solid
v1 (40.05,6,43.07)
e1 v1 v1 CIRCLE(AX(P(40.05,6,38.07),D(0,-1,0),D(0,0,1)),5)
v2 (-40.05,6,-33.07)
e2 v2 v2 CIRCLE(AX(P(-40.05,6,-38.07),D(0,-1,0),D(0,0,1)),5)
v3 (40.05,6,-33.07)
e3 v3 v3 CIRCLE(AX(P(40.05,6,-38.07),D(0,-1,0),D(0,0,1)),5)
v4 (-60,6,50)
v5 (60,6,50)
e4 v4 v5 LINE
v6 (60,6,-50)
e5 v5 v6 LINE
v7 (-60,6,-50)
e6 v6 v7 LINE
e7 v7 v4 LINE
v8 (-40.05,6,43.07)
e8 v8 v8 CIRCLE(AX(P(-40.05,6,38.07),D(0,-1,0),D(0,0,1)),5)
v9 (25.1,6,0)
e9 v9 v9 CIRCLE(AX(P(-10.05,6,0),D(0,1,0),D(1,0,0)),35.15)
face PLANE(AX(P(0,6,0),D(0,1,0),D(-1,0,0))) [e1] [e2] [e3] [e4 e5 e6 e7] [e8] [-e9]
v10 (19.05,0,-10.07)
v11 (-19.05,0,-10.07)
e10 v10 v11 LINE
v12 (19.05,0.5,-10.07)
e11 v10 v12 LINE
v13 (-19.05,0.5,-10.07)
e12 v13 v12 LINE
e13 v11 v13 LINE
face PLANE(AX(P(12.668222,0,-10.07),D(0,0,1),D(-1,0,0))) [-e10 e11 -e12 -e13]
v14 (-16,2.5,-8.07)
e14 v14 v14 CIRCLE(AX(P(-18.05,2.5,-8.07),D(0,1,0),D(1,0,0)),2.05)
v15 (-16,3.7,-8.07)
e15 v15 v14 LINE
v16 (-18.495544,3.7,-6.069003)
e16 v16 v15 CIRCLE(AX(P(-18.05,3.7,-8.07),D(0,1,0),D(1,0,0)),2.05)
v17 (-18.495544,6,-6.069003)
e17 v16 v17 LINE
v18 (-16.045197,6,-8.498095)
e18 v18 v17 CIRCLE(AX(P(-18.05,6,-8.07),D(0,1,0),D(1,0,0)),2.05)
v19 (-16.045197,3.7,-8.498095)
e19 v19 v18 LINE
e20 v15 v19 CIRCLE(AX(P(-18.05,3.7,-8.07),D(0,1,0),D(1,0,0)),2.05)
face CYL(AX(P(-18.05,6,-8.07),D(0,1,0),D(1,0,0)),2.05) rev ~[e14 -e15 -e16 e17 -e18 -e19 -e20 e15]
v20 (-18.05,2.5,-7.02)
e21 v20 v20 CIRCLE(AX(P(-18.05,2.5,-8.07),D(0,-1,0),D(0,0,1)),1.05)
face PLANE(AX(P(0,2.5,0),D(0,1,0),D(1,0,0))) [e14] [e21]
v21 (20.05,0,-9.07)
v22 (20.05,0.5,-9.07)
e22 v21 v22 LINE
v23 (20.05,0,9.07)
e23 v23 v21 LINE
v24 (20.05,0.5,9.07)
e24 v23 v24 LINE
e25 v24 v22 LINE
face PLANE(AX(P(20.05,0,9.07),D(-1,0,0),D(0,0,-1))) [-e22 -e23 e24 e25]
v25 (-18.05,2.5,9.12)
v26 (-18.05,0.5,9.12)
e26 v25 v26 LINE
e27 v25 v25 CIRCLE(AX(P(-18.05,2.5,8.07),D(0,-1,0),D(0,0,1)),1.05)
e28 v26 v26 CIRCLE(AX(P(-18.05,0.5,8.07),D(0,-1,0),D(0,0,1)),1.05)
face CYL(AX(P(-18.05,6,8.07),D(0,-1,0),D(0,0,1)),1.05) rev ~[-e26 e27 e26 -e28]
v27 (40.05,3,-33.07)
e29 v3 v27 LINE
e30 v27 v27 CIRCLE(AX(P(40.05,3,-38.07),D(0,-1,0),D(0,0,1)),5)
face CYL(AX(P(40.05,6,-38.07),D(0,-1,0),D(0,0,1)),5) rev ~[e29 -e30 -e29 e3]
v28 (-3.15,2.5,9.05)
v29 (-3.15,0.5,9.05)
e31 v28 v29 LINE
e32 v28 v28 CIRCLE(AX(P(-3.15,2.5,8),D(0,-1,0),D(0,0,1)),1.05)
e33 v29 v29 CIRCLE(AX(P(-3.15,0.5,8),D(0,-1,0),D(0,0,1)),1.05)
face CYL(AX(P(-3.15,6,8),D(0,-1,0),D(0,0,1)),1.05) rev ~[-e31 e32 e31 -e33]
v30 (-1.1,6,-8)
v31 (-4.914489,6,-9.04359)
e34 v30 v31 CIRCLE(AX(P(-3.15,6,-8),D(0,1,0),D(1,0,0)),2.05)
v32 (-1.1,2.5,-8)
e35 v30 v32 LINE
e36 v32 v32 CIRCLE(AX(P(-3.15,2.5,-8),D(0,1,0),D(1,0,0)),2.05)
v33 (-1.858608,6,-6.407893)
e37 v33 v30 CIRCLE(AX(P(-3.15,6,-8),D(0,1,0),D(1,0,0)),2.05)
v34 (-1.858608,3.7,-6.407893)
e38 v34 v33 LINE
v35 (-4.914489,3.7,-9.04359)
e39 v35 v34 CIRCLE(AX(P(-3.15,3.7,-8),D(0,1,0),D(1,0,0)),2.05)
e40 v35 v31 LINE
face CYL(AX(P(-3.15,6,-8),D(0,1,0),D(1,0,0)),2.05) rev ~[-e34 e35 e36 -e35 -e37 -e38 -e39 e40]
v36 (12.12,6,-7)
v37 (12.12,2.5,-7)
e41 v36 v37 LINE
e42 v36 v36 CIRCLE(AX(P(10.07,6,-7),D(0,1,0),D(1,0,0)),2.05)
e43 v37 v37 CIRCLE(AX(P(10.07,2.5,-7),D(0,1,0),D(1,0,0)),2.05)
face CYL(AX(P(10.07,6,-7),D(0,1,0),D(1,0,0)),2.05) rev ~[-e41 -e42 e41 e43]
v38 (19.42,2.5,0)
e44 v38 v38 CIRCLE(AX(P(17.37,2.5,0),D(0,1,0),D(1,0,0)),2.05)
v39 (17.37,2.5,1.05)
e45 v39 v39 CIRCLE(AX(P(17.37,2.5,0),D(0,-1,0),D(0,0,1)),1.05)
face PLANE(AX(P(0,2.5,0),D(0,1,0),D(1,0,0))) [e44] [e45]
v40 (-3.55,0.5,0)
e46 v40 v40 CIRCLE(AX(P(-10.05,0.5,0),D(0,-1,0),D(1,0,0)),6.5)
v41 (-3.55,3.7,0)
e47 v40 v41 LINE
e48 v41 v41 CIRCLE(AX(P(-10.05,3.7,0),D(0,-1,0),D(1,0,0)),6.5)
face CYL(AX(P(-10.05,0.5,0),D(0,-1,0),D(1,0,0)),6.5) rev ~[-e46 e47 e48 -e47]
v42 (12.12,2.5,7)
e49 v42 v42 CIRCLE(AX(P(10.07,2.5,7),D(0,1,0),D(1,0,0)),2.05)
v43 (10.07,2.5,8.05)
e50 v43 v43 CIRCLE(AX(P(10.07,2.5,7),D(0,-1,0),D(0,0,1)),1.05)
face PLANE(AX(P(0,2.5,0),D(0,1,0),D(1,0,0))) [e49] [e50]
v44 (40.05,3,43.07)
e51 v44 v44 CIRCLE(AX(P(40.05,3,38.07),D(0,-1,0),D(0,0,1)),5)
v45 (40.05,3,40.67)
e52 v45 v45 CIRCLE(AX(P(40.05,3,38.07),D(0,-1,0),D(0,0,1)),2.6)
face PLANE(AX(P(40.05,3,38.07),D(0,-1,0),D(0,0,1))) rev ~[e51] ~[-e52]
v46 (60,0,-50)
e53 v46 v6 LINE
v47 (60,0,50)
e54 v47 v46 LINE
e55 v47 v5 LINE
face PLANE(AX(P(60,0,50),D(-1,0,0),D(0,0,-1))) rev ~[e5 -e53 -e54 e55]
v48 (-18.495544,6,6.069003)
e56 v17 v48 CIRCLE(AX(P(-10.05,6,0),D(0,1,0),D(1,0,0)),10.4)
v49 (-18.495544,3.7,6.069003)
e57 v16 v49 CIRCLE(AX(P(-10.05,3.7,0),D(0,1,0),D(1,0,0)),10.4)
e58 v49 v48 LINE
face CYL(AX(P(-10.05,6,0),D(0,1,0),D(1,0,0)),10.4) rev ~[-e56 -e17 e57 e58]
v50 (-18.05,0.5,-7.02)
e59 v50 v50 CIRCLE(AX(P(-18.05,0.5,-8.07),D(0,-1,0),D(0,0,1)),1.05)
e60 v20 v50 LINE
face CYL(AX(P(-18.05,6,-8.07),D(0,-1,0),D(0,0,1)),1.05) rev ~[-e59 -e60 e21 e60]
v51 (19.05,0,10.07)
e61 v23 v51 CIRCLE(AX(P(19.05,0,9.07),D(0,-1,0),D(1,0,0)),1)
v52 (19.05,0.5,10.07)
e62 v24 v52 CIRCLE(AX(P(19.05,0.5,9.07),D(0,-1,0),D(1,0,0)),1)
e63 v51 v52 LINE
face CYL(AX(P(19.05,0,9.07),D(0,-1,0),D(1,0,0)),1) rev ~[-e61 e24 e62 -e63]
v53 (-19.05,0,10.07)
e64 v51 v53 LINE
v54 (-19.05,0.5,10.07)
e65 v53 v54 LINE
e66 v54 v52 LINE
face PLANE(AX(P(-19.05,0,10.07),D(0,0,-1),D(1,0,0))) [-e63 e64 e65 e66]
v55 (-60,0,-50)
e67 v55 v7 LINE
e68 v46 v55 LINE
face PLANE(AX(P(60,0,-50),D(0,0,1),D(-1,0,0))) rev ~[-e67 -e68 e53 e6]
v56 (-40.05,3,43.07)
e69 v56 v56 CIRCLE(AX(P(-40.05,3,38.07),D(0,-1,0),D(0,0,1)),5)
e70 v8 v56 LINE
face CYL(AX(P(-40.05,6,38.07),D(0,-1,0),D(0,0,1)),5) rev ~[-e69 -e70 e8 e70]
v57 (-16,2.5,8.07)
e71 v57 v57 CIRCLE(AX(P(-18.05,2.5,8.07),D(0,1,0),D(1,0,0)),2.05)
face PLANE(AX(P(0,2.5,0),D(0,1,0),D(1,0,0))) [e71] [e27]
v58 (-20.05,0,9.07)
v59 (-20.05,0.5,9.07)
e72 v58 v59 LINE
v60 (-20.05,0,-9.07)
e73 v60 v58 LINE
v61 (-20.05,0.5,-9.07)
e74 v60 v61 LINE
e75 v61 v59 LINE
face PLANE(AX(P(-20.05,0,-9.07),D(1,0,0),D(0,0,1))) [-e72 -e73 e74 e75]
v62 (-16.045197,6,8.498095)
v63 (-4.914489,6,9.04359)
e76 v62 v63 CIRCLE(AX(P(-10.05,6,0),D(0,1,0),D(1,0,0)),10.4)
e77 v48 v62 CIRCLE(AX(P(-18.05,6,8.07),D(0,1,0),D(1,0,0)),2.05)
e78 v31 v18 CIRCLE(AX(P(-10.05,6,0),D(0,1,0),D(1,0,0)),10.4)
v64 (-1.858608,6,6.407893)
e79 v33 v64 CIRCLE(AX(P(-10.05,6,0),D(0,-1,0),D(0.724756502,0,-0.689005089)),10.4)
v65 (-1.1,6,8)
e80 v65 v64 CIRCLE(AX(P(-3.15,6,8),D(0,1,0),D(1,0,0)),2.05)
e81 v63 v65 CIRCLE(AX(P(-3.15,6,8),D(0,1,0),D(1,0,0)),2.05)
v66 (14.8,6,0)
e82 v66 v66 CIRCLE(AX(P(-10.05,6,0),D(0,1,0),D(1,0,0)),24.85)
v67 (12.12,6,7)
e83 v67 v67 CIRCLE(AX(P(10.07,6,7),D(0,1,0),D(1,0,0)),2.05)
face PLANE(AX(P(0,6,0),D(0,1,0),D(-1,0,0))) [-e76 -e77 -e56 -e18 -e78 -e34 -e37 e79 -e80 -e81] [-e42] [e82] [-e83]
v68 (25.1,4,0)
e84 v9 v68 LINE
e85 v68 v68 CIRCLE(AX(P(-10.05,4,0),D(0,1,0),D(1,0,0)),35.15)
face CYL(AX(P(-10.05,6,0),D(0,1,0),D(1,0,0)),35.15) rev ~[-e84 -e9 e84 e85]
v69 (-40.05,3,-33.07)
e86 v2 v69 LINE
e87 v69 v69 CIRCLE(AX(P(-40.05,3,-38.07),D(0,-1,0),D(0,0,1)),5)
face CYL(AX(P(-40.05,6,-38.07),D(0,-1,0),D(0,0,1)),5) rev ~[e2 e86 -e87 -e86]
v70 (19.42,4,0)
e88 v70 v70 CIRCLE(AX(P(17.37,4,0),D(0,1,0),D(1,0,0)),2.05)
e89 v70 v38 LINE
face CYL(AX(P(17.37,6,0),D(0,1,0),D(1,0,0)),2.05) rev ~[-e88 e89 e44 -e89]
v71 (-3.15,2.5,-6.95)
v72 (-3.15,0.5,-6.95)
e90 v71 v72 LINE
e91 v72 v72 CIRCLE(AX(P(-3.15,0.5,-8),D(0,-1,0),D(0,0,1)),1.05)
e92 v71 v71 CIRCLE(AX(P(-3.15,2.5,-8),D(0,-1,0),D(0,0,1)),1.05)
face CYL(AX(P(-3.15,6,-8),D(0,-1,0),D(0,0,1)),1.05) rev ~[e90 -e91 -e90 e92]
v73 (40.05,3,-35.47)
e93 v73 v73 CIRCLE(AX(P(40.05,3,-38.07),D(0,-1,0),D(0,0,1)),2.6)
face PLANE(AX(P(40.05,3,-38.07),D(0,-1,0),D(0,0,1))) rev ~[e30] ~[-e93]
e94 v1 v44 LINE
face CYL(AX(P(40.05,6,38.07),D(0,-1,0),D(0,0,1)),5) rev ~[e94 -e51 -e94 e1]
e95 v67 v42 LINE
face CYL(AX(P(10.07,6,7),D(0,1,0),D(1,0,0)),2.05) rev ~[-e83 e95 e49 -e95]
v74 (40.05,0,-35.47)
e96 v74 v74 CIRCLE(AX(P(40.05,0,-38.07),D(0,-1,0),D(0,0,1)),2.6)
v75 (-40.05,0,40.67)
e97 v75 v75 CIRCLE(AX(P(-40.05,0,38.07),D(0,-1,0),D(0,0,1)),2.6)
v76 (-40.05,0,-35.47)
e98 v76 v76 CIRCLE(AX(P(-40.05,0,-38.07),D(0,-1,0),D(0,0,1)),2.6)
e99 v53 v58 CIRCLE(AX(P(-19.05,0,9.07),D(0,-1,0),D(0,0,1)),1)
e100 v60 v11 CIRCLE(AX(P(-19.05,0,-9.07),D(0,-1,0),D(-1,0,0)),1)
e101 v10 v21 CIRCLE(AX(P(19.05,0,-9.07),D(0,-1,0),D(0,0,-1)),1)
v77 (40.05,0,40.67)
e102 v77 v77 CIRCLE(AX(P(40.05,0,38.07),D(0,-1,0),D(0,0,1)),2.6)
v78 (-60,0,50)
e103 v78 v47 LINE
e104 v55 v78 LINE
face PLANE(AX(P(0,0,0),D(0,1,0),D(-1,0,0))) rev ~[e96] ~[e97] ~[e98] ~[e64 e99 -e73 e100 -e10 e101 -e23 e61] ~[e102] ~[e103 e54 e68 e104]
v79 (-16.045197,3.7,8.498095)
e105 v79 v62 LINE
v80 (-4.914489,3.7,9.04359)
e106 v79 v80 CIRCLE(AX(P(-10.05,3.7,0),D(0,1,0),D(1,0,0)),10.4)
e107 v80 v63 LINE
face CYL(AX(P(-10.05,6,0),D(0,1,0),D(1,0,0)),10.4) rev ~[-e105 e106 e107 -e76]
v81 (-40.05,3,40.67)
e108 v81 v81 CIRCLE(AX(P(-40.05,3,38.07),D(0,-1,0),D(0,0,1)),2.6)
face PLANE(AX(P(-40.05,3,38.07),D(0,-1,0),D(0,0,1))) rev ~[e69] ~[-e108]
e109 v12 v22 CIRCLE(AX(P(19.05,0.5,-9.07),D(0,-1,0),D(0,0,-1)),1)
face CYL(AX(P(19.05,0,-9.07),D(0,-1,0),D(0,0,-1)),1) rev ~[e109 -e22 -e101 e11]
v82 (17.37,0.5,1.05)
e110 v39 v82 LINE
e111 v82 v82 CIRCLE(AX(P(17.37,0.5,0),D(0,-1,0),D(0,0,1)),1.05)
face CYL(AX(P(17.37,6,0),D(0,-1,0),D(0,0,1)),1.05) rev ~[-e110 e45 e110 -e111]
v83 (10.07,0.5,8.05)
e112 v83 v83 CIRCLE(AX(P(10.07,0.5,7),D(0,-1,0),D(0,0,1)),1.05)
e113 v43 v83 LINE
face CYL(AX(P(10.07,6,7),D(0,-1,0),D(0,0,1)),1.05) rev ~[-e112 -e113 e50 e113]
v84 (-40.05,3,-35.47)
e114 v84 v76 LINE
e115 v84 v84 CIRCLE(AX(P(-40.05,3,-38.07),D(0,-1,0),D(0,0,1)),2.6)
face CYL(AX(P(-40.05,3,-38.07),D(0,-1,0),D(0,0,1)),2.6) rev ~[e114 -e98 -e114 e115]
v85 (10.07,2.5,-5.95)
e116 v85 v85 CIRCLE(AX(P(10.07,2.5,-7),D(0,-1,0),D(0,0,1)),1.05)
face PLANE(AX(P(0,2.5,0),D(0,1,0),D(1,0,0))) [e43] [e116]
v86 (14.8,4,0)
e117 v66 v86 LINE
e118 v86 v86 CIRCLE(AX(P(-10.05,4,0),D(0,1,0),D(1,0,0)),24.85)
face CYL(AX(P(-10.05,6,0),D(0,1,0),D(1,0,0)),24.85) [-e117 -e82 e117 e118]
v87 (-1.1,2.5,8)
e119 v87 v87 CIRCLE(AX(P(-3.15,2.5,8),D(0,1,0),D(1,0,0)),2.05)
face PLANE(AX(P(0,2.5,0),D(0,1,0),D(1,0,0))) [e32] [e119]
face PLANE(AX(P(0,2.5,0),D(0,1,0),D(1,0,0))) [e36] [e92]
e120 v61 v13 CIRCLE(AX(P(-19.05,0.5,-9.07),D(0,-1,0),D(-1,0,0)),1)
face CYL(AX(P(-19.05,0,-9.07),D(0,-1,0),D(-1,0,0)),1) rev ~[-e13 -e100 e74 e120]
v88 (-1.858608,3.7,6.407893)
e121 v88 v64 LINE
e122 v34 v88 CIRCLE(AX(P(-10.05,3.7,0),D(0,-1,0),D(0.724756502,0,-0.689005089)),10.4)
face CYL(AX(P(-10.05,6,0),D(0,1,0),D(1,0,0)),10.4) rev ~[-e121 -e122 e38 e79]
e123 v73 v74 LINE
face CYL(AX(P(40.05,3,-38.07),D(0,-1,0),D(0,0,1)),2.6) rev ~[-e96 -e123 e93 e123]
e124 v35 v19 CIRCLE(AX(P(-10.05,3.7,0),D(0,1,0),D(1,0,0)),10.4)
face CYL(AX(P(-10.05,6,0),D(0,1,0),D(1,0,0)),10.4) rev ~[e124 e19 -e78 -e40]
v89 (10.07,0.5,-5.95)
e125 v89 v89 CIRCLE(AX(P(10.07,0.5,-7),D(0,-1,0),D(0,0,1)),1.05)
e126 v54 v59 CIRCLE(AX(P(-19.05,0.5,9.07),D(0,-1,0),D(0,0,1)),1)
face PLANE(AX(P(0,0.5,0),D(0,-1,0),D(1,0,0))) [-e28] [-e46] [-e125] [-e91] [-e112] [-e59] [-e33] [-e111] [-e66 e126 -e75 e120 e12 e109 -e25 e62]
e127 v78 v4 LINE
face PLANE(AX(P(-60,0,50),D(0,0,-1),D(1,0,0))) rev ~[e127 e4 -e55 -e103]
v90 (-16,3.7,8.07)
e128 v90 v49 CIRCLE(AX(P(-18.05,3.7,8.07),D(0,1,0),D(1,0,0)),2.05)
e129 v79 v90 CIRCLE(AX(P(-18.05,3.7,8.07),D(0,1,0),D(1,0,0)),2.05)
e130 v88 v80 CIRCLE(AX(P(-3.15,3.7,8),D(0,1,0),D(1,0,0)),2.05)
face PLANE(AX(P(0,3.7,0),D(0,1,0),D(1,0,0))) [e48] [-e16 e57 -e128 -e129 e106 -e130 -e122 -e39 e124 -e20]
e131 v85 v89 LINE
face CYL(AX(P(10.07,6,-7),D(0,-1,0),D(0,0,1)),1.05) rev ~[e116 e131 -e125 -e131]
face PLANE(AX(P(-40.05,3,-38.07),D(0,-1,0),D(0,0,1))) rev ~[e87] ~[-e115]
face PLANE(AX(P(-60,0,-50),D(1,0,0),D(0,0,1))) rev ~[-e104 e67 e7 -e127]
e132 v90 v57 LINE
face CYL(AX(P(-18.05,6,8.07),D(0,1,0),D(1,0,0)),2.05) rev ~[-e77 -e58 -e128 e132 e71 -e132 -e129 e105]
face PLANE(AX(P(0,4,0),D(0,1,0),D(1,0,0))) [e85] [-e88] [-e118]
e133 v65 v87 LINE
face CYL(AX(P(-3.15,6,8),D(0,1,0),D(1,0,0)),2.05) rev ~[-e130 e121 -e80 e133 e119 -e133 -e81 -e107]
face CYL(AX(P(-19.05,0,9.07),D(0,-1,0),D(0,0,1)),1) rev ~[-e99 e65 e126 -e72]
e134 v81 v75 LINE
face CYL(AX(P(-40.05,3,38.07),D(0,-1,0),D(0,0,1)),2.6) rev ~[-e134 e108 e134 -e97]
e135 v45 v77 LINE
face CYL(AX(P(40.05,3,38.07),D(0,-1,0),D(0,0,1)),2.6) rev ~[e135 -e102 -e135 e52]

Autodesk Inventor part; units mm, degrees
ref_plane "YZ Plane" through (0, 0, 0) normal (1, 0, 0) x (0, 1, 0)
ref_plane "XZ Plane" through (0, 0, 0) normal (0, 1, 0) x (-1, 0, 0)
ref_plane "XY Plane" through (0, 0, 0) normal (0, 0, 1) x (1, 0, 0)
sketch "Sketch1" plane through (0, 0, 0) normal (0, 1, 0) x (-1, 0, 0)
  line L0 (60, 50) -> (-60, 50)
  line L1 (-60, 50) -> (-60, -50)
  line L2 (-60, -50) -> (60, -50)
  line L3 (60, -50) -> (60, 50)
  line L4 (60, 50) -> (-60, -50) construction
  line L5 (-60, 50) -> (60, -50) construction
  point P0 (0, 0)
  dimension "d0" = 120
  dimension "d1" = 100
extrude "Extrusion1" add sketch "Sketch1" along normal blind 6
sketch "Sketch5" plane through (0, 6, 0) normal (0, 1, 0) x (1, 0, 0)
  circle A0 centre (-10.05, 0) radius 1.2295 projected
  circle A1 centre (-10.05, 0) radius 10.4
  point P0 (0, 0)
  dimension "d16" = 20.8
extrude "Extrusion3" cut sketch "Sketch5" against normal blind 2.3 contours A0 | A1
hole "Hole1" at (-18.05, 6, -8.07) at (-18.05, 6, 8.07) at (-3.15, 6, 8) at (-3.15, 6, -8) at (10.07, 6, 7) at (17.37, 6, 0) at (10.07, 6, -7) direction (0, -1, 0) diameter 2.1 end through all
sketch "Sketch8" plane through (0, 6, 0) normal (0, 1, 0) x (1, 0, 0)
  arc A0 (-17.650182, -7.0991) -> (-17.08262, -7.661739) centre (-18.05, -8.07) ccw
  arc A1 (-17.08262, 7.661739) -> (-17.650182, 7.0991) centre (-18.05, 8.07) ccw
  arc A2 (-4.068914, -8.508032) -> (-2.512532, -7.165653) centre (-3.15, -8) ccw
  arc A3 (-2.512532, 7.165653) -> (-4.068914, 8.508032) centre (-3.15, 8) ccw
  circle A4 centre (10.07, -7) radius 1.05
  circle A5 centre (17.37, 0) radius 1.05
  circle A6 centre (10.07, 7) radius 1.05
  circle A7 centre (-18.05, -8.07) radius 2.05
  circle A8 centre (-18.05, 8.07) radius 2.05
  circle A9 centre (-3.15, -8) radius 2.05
  circle A10 centre (-3.15, 8) radius 2.05
  circle A11 centre (10.07, 7) radius 2.05
  circle A12 centre (10.07, -7) radius 2.05
  circle A13 centre (17.37, 0) radius 2.05
  point P0 (0, 0)
  dimension "d31" = 4.1
extrude "Extrusion6" cut sketch "Sketch8" against normal blind 3.5 contours A4 | A5 | A6 | A7 | A8 | A9 | A10 | A11 | A12 | A13
sketch "Sketch11" plane through (0, 6, 0) normal (0, 1, 0) x (1, 0, 0)
  circle A0 centre (-10.05, 0) radius 25 projected
  circle A1 centre (-10.05, 0) radius 35 projected
  circle A2 centre (-10.05, 0) radius 24.85
  circle A3 centre (-10.05, 0) radius 35.15
  point P0 (0, 0)
  dimension "d38" = 0.15
  dimension "d39" = 0.15
sketch "Sketch11 outline for Extrusion9" plane through (0, 6, 0) normal (0, 1, 0) x (1, 0, 0)
  circle A0 centre (-10.05, 0) radius 35.15
  circle A1 centre (-10.05, 0) radius 24.85
extrude "Extrusion9" cut sketch "Sketch11 outline for Extrusion9" against normal blind 2
sketch "Sketch12" plane through (0, 6, 0) normal (0, 1, 0) x (1, 0, 0)
  line L0 (-44.2, 50.07) -> (-44.2, -50.07) construction
  line L1 (-35.9, 50.07) -> (-35.9, -50.07) construction
  line L2 (35.9, 50.07) -> (35.9, -50.07) construction
  line L3 (44.2, 50.07) -> (44.2, -50.07) construction
  line L4 (60, 50) -> (-60, 50) projected
  line L5 (-40.05, -50.07) -> (-40.05, 50) construction
  line L6 (40.05, -50.07) -> (40.05, 50) construction
  line L7 (-44.2, -50.07) -> (-35.9, -50.07) construction
  line L8 (35.9, -50.07) -> (44.2, -50.07) construction
  line L9 (-60, 50) -> (-60, -50) projected
  line L10 (60, -50) -> (60, 50) projected
  line L11 (-60, 0) -> (60, 0) construction
  point P0 (0, 0)
  point P1 (-40.05, -38.07)
  point P2 (40.05, -38.07)
  point P3 (-40.05, 38.07)
  point P4 (40.05, 38.07)
  dimension "d42" = 12
hole "Hole2" at (-40.05, 6, 38.07) at (40.05, 6, 38.07) at (-40.05, 6, -38.07) at (40.05, 6, -38.07) direction (0, -1, 0) diameter 5.2 end through all counterbore diameter 10 counterbore depth 3
sketch "Sketch13" plane through (0, 0, 0) normal (0, -1, 0) x (1, 0, 0)
  circle A0 centre (-10.05, 0) radius 24.85 projected
  line L0 (-19.05, 10.07) -> (19.05, 10.07)
  line L1 (20.05, 9.07) -> (20.05, -9.07)
  line L2 (19.05, -10.07) -> (-19.05, -10.07)
  line L3 (-20.05, -9.07) -> (-20.05, 9.07)
  arc A1 (-19.05, 10.07) -> (-20.05, 9.07) centre (-19.05, 9.07) ccw
  arc A2 (20.05, 9.07) -> (19.05, 10.07) centre (19.05, 9.07) ccw
  arc A3 (19.05, -10.07) -> (20.05, -9.07) centre (19.05, -9.07) ccw
  arc A4 (-20.05, -9.07) -> (-19.05, -10.07) centre (-19.05, -9.07) ccw
  point P0 (0, 0)
  point P1 (20.05, -10.07)
  point P2 (20.05, 10.07)
  point P3 (-20.05, -10.07)
  point P4 (-20.05, 0)
  dimension "d50" = 40.1
  dimension "d51" = 20.14
  dimension "d52" = 10
  dimension "d53" = 1
extrude "Extrusion10" cut sketch "Sketch13" against normal blind 0.5 contours A0 L2 A4 L3 A1 L0 | A0 L0 A2 L1 A3 L2 picked at (-7.766667, 0)
sketch "Sketch14" plane through (0, 0.5, 0) normal (0, -1, 0) x (1, 0, 0)
  circle A0 centre (-10.05, 0) radius 24.85 projected
  circle A1 centre (-10.05, 0) radius 6.5
  point P0 (0, 0)
  dimension "d56" = 13
extrude "Extrusion11" cut sketch "Sketch14" against normal through all contours A1
properties part number "axis_1_top_frame" material "Aluminum 6061-AHC"
